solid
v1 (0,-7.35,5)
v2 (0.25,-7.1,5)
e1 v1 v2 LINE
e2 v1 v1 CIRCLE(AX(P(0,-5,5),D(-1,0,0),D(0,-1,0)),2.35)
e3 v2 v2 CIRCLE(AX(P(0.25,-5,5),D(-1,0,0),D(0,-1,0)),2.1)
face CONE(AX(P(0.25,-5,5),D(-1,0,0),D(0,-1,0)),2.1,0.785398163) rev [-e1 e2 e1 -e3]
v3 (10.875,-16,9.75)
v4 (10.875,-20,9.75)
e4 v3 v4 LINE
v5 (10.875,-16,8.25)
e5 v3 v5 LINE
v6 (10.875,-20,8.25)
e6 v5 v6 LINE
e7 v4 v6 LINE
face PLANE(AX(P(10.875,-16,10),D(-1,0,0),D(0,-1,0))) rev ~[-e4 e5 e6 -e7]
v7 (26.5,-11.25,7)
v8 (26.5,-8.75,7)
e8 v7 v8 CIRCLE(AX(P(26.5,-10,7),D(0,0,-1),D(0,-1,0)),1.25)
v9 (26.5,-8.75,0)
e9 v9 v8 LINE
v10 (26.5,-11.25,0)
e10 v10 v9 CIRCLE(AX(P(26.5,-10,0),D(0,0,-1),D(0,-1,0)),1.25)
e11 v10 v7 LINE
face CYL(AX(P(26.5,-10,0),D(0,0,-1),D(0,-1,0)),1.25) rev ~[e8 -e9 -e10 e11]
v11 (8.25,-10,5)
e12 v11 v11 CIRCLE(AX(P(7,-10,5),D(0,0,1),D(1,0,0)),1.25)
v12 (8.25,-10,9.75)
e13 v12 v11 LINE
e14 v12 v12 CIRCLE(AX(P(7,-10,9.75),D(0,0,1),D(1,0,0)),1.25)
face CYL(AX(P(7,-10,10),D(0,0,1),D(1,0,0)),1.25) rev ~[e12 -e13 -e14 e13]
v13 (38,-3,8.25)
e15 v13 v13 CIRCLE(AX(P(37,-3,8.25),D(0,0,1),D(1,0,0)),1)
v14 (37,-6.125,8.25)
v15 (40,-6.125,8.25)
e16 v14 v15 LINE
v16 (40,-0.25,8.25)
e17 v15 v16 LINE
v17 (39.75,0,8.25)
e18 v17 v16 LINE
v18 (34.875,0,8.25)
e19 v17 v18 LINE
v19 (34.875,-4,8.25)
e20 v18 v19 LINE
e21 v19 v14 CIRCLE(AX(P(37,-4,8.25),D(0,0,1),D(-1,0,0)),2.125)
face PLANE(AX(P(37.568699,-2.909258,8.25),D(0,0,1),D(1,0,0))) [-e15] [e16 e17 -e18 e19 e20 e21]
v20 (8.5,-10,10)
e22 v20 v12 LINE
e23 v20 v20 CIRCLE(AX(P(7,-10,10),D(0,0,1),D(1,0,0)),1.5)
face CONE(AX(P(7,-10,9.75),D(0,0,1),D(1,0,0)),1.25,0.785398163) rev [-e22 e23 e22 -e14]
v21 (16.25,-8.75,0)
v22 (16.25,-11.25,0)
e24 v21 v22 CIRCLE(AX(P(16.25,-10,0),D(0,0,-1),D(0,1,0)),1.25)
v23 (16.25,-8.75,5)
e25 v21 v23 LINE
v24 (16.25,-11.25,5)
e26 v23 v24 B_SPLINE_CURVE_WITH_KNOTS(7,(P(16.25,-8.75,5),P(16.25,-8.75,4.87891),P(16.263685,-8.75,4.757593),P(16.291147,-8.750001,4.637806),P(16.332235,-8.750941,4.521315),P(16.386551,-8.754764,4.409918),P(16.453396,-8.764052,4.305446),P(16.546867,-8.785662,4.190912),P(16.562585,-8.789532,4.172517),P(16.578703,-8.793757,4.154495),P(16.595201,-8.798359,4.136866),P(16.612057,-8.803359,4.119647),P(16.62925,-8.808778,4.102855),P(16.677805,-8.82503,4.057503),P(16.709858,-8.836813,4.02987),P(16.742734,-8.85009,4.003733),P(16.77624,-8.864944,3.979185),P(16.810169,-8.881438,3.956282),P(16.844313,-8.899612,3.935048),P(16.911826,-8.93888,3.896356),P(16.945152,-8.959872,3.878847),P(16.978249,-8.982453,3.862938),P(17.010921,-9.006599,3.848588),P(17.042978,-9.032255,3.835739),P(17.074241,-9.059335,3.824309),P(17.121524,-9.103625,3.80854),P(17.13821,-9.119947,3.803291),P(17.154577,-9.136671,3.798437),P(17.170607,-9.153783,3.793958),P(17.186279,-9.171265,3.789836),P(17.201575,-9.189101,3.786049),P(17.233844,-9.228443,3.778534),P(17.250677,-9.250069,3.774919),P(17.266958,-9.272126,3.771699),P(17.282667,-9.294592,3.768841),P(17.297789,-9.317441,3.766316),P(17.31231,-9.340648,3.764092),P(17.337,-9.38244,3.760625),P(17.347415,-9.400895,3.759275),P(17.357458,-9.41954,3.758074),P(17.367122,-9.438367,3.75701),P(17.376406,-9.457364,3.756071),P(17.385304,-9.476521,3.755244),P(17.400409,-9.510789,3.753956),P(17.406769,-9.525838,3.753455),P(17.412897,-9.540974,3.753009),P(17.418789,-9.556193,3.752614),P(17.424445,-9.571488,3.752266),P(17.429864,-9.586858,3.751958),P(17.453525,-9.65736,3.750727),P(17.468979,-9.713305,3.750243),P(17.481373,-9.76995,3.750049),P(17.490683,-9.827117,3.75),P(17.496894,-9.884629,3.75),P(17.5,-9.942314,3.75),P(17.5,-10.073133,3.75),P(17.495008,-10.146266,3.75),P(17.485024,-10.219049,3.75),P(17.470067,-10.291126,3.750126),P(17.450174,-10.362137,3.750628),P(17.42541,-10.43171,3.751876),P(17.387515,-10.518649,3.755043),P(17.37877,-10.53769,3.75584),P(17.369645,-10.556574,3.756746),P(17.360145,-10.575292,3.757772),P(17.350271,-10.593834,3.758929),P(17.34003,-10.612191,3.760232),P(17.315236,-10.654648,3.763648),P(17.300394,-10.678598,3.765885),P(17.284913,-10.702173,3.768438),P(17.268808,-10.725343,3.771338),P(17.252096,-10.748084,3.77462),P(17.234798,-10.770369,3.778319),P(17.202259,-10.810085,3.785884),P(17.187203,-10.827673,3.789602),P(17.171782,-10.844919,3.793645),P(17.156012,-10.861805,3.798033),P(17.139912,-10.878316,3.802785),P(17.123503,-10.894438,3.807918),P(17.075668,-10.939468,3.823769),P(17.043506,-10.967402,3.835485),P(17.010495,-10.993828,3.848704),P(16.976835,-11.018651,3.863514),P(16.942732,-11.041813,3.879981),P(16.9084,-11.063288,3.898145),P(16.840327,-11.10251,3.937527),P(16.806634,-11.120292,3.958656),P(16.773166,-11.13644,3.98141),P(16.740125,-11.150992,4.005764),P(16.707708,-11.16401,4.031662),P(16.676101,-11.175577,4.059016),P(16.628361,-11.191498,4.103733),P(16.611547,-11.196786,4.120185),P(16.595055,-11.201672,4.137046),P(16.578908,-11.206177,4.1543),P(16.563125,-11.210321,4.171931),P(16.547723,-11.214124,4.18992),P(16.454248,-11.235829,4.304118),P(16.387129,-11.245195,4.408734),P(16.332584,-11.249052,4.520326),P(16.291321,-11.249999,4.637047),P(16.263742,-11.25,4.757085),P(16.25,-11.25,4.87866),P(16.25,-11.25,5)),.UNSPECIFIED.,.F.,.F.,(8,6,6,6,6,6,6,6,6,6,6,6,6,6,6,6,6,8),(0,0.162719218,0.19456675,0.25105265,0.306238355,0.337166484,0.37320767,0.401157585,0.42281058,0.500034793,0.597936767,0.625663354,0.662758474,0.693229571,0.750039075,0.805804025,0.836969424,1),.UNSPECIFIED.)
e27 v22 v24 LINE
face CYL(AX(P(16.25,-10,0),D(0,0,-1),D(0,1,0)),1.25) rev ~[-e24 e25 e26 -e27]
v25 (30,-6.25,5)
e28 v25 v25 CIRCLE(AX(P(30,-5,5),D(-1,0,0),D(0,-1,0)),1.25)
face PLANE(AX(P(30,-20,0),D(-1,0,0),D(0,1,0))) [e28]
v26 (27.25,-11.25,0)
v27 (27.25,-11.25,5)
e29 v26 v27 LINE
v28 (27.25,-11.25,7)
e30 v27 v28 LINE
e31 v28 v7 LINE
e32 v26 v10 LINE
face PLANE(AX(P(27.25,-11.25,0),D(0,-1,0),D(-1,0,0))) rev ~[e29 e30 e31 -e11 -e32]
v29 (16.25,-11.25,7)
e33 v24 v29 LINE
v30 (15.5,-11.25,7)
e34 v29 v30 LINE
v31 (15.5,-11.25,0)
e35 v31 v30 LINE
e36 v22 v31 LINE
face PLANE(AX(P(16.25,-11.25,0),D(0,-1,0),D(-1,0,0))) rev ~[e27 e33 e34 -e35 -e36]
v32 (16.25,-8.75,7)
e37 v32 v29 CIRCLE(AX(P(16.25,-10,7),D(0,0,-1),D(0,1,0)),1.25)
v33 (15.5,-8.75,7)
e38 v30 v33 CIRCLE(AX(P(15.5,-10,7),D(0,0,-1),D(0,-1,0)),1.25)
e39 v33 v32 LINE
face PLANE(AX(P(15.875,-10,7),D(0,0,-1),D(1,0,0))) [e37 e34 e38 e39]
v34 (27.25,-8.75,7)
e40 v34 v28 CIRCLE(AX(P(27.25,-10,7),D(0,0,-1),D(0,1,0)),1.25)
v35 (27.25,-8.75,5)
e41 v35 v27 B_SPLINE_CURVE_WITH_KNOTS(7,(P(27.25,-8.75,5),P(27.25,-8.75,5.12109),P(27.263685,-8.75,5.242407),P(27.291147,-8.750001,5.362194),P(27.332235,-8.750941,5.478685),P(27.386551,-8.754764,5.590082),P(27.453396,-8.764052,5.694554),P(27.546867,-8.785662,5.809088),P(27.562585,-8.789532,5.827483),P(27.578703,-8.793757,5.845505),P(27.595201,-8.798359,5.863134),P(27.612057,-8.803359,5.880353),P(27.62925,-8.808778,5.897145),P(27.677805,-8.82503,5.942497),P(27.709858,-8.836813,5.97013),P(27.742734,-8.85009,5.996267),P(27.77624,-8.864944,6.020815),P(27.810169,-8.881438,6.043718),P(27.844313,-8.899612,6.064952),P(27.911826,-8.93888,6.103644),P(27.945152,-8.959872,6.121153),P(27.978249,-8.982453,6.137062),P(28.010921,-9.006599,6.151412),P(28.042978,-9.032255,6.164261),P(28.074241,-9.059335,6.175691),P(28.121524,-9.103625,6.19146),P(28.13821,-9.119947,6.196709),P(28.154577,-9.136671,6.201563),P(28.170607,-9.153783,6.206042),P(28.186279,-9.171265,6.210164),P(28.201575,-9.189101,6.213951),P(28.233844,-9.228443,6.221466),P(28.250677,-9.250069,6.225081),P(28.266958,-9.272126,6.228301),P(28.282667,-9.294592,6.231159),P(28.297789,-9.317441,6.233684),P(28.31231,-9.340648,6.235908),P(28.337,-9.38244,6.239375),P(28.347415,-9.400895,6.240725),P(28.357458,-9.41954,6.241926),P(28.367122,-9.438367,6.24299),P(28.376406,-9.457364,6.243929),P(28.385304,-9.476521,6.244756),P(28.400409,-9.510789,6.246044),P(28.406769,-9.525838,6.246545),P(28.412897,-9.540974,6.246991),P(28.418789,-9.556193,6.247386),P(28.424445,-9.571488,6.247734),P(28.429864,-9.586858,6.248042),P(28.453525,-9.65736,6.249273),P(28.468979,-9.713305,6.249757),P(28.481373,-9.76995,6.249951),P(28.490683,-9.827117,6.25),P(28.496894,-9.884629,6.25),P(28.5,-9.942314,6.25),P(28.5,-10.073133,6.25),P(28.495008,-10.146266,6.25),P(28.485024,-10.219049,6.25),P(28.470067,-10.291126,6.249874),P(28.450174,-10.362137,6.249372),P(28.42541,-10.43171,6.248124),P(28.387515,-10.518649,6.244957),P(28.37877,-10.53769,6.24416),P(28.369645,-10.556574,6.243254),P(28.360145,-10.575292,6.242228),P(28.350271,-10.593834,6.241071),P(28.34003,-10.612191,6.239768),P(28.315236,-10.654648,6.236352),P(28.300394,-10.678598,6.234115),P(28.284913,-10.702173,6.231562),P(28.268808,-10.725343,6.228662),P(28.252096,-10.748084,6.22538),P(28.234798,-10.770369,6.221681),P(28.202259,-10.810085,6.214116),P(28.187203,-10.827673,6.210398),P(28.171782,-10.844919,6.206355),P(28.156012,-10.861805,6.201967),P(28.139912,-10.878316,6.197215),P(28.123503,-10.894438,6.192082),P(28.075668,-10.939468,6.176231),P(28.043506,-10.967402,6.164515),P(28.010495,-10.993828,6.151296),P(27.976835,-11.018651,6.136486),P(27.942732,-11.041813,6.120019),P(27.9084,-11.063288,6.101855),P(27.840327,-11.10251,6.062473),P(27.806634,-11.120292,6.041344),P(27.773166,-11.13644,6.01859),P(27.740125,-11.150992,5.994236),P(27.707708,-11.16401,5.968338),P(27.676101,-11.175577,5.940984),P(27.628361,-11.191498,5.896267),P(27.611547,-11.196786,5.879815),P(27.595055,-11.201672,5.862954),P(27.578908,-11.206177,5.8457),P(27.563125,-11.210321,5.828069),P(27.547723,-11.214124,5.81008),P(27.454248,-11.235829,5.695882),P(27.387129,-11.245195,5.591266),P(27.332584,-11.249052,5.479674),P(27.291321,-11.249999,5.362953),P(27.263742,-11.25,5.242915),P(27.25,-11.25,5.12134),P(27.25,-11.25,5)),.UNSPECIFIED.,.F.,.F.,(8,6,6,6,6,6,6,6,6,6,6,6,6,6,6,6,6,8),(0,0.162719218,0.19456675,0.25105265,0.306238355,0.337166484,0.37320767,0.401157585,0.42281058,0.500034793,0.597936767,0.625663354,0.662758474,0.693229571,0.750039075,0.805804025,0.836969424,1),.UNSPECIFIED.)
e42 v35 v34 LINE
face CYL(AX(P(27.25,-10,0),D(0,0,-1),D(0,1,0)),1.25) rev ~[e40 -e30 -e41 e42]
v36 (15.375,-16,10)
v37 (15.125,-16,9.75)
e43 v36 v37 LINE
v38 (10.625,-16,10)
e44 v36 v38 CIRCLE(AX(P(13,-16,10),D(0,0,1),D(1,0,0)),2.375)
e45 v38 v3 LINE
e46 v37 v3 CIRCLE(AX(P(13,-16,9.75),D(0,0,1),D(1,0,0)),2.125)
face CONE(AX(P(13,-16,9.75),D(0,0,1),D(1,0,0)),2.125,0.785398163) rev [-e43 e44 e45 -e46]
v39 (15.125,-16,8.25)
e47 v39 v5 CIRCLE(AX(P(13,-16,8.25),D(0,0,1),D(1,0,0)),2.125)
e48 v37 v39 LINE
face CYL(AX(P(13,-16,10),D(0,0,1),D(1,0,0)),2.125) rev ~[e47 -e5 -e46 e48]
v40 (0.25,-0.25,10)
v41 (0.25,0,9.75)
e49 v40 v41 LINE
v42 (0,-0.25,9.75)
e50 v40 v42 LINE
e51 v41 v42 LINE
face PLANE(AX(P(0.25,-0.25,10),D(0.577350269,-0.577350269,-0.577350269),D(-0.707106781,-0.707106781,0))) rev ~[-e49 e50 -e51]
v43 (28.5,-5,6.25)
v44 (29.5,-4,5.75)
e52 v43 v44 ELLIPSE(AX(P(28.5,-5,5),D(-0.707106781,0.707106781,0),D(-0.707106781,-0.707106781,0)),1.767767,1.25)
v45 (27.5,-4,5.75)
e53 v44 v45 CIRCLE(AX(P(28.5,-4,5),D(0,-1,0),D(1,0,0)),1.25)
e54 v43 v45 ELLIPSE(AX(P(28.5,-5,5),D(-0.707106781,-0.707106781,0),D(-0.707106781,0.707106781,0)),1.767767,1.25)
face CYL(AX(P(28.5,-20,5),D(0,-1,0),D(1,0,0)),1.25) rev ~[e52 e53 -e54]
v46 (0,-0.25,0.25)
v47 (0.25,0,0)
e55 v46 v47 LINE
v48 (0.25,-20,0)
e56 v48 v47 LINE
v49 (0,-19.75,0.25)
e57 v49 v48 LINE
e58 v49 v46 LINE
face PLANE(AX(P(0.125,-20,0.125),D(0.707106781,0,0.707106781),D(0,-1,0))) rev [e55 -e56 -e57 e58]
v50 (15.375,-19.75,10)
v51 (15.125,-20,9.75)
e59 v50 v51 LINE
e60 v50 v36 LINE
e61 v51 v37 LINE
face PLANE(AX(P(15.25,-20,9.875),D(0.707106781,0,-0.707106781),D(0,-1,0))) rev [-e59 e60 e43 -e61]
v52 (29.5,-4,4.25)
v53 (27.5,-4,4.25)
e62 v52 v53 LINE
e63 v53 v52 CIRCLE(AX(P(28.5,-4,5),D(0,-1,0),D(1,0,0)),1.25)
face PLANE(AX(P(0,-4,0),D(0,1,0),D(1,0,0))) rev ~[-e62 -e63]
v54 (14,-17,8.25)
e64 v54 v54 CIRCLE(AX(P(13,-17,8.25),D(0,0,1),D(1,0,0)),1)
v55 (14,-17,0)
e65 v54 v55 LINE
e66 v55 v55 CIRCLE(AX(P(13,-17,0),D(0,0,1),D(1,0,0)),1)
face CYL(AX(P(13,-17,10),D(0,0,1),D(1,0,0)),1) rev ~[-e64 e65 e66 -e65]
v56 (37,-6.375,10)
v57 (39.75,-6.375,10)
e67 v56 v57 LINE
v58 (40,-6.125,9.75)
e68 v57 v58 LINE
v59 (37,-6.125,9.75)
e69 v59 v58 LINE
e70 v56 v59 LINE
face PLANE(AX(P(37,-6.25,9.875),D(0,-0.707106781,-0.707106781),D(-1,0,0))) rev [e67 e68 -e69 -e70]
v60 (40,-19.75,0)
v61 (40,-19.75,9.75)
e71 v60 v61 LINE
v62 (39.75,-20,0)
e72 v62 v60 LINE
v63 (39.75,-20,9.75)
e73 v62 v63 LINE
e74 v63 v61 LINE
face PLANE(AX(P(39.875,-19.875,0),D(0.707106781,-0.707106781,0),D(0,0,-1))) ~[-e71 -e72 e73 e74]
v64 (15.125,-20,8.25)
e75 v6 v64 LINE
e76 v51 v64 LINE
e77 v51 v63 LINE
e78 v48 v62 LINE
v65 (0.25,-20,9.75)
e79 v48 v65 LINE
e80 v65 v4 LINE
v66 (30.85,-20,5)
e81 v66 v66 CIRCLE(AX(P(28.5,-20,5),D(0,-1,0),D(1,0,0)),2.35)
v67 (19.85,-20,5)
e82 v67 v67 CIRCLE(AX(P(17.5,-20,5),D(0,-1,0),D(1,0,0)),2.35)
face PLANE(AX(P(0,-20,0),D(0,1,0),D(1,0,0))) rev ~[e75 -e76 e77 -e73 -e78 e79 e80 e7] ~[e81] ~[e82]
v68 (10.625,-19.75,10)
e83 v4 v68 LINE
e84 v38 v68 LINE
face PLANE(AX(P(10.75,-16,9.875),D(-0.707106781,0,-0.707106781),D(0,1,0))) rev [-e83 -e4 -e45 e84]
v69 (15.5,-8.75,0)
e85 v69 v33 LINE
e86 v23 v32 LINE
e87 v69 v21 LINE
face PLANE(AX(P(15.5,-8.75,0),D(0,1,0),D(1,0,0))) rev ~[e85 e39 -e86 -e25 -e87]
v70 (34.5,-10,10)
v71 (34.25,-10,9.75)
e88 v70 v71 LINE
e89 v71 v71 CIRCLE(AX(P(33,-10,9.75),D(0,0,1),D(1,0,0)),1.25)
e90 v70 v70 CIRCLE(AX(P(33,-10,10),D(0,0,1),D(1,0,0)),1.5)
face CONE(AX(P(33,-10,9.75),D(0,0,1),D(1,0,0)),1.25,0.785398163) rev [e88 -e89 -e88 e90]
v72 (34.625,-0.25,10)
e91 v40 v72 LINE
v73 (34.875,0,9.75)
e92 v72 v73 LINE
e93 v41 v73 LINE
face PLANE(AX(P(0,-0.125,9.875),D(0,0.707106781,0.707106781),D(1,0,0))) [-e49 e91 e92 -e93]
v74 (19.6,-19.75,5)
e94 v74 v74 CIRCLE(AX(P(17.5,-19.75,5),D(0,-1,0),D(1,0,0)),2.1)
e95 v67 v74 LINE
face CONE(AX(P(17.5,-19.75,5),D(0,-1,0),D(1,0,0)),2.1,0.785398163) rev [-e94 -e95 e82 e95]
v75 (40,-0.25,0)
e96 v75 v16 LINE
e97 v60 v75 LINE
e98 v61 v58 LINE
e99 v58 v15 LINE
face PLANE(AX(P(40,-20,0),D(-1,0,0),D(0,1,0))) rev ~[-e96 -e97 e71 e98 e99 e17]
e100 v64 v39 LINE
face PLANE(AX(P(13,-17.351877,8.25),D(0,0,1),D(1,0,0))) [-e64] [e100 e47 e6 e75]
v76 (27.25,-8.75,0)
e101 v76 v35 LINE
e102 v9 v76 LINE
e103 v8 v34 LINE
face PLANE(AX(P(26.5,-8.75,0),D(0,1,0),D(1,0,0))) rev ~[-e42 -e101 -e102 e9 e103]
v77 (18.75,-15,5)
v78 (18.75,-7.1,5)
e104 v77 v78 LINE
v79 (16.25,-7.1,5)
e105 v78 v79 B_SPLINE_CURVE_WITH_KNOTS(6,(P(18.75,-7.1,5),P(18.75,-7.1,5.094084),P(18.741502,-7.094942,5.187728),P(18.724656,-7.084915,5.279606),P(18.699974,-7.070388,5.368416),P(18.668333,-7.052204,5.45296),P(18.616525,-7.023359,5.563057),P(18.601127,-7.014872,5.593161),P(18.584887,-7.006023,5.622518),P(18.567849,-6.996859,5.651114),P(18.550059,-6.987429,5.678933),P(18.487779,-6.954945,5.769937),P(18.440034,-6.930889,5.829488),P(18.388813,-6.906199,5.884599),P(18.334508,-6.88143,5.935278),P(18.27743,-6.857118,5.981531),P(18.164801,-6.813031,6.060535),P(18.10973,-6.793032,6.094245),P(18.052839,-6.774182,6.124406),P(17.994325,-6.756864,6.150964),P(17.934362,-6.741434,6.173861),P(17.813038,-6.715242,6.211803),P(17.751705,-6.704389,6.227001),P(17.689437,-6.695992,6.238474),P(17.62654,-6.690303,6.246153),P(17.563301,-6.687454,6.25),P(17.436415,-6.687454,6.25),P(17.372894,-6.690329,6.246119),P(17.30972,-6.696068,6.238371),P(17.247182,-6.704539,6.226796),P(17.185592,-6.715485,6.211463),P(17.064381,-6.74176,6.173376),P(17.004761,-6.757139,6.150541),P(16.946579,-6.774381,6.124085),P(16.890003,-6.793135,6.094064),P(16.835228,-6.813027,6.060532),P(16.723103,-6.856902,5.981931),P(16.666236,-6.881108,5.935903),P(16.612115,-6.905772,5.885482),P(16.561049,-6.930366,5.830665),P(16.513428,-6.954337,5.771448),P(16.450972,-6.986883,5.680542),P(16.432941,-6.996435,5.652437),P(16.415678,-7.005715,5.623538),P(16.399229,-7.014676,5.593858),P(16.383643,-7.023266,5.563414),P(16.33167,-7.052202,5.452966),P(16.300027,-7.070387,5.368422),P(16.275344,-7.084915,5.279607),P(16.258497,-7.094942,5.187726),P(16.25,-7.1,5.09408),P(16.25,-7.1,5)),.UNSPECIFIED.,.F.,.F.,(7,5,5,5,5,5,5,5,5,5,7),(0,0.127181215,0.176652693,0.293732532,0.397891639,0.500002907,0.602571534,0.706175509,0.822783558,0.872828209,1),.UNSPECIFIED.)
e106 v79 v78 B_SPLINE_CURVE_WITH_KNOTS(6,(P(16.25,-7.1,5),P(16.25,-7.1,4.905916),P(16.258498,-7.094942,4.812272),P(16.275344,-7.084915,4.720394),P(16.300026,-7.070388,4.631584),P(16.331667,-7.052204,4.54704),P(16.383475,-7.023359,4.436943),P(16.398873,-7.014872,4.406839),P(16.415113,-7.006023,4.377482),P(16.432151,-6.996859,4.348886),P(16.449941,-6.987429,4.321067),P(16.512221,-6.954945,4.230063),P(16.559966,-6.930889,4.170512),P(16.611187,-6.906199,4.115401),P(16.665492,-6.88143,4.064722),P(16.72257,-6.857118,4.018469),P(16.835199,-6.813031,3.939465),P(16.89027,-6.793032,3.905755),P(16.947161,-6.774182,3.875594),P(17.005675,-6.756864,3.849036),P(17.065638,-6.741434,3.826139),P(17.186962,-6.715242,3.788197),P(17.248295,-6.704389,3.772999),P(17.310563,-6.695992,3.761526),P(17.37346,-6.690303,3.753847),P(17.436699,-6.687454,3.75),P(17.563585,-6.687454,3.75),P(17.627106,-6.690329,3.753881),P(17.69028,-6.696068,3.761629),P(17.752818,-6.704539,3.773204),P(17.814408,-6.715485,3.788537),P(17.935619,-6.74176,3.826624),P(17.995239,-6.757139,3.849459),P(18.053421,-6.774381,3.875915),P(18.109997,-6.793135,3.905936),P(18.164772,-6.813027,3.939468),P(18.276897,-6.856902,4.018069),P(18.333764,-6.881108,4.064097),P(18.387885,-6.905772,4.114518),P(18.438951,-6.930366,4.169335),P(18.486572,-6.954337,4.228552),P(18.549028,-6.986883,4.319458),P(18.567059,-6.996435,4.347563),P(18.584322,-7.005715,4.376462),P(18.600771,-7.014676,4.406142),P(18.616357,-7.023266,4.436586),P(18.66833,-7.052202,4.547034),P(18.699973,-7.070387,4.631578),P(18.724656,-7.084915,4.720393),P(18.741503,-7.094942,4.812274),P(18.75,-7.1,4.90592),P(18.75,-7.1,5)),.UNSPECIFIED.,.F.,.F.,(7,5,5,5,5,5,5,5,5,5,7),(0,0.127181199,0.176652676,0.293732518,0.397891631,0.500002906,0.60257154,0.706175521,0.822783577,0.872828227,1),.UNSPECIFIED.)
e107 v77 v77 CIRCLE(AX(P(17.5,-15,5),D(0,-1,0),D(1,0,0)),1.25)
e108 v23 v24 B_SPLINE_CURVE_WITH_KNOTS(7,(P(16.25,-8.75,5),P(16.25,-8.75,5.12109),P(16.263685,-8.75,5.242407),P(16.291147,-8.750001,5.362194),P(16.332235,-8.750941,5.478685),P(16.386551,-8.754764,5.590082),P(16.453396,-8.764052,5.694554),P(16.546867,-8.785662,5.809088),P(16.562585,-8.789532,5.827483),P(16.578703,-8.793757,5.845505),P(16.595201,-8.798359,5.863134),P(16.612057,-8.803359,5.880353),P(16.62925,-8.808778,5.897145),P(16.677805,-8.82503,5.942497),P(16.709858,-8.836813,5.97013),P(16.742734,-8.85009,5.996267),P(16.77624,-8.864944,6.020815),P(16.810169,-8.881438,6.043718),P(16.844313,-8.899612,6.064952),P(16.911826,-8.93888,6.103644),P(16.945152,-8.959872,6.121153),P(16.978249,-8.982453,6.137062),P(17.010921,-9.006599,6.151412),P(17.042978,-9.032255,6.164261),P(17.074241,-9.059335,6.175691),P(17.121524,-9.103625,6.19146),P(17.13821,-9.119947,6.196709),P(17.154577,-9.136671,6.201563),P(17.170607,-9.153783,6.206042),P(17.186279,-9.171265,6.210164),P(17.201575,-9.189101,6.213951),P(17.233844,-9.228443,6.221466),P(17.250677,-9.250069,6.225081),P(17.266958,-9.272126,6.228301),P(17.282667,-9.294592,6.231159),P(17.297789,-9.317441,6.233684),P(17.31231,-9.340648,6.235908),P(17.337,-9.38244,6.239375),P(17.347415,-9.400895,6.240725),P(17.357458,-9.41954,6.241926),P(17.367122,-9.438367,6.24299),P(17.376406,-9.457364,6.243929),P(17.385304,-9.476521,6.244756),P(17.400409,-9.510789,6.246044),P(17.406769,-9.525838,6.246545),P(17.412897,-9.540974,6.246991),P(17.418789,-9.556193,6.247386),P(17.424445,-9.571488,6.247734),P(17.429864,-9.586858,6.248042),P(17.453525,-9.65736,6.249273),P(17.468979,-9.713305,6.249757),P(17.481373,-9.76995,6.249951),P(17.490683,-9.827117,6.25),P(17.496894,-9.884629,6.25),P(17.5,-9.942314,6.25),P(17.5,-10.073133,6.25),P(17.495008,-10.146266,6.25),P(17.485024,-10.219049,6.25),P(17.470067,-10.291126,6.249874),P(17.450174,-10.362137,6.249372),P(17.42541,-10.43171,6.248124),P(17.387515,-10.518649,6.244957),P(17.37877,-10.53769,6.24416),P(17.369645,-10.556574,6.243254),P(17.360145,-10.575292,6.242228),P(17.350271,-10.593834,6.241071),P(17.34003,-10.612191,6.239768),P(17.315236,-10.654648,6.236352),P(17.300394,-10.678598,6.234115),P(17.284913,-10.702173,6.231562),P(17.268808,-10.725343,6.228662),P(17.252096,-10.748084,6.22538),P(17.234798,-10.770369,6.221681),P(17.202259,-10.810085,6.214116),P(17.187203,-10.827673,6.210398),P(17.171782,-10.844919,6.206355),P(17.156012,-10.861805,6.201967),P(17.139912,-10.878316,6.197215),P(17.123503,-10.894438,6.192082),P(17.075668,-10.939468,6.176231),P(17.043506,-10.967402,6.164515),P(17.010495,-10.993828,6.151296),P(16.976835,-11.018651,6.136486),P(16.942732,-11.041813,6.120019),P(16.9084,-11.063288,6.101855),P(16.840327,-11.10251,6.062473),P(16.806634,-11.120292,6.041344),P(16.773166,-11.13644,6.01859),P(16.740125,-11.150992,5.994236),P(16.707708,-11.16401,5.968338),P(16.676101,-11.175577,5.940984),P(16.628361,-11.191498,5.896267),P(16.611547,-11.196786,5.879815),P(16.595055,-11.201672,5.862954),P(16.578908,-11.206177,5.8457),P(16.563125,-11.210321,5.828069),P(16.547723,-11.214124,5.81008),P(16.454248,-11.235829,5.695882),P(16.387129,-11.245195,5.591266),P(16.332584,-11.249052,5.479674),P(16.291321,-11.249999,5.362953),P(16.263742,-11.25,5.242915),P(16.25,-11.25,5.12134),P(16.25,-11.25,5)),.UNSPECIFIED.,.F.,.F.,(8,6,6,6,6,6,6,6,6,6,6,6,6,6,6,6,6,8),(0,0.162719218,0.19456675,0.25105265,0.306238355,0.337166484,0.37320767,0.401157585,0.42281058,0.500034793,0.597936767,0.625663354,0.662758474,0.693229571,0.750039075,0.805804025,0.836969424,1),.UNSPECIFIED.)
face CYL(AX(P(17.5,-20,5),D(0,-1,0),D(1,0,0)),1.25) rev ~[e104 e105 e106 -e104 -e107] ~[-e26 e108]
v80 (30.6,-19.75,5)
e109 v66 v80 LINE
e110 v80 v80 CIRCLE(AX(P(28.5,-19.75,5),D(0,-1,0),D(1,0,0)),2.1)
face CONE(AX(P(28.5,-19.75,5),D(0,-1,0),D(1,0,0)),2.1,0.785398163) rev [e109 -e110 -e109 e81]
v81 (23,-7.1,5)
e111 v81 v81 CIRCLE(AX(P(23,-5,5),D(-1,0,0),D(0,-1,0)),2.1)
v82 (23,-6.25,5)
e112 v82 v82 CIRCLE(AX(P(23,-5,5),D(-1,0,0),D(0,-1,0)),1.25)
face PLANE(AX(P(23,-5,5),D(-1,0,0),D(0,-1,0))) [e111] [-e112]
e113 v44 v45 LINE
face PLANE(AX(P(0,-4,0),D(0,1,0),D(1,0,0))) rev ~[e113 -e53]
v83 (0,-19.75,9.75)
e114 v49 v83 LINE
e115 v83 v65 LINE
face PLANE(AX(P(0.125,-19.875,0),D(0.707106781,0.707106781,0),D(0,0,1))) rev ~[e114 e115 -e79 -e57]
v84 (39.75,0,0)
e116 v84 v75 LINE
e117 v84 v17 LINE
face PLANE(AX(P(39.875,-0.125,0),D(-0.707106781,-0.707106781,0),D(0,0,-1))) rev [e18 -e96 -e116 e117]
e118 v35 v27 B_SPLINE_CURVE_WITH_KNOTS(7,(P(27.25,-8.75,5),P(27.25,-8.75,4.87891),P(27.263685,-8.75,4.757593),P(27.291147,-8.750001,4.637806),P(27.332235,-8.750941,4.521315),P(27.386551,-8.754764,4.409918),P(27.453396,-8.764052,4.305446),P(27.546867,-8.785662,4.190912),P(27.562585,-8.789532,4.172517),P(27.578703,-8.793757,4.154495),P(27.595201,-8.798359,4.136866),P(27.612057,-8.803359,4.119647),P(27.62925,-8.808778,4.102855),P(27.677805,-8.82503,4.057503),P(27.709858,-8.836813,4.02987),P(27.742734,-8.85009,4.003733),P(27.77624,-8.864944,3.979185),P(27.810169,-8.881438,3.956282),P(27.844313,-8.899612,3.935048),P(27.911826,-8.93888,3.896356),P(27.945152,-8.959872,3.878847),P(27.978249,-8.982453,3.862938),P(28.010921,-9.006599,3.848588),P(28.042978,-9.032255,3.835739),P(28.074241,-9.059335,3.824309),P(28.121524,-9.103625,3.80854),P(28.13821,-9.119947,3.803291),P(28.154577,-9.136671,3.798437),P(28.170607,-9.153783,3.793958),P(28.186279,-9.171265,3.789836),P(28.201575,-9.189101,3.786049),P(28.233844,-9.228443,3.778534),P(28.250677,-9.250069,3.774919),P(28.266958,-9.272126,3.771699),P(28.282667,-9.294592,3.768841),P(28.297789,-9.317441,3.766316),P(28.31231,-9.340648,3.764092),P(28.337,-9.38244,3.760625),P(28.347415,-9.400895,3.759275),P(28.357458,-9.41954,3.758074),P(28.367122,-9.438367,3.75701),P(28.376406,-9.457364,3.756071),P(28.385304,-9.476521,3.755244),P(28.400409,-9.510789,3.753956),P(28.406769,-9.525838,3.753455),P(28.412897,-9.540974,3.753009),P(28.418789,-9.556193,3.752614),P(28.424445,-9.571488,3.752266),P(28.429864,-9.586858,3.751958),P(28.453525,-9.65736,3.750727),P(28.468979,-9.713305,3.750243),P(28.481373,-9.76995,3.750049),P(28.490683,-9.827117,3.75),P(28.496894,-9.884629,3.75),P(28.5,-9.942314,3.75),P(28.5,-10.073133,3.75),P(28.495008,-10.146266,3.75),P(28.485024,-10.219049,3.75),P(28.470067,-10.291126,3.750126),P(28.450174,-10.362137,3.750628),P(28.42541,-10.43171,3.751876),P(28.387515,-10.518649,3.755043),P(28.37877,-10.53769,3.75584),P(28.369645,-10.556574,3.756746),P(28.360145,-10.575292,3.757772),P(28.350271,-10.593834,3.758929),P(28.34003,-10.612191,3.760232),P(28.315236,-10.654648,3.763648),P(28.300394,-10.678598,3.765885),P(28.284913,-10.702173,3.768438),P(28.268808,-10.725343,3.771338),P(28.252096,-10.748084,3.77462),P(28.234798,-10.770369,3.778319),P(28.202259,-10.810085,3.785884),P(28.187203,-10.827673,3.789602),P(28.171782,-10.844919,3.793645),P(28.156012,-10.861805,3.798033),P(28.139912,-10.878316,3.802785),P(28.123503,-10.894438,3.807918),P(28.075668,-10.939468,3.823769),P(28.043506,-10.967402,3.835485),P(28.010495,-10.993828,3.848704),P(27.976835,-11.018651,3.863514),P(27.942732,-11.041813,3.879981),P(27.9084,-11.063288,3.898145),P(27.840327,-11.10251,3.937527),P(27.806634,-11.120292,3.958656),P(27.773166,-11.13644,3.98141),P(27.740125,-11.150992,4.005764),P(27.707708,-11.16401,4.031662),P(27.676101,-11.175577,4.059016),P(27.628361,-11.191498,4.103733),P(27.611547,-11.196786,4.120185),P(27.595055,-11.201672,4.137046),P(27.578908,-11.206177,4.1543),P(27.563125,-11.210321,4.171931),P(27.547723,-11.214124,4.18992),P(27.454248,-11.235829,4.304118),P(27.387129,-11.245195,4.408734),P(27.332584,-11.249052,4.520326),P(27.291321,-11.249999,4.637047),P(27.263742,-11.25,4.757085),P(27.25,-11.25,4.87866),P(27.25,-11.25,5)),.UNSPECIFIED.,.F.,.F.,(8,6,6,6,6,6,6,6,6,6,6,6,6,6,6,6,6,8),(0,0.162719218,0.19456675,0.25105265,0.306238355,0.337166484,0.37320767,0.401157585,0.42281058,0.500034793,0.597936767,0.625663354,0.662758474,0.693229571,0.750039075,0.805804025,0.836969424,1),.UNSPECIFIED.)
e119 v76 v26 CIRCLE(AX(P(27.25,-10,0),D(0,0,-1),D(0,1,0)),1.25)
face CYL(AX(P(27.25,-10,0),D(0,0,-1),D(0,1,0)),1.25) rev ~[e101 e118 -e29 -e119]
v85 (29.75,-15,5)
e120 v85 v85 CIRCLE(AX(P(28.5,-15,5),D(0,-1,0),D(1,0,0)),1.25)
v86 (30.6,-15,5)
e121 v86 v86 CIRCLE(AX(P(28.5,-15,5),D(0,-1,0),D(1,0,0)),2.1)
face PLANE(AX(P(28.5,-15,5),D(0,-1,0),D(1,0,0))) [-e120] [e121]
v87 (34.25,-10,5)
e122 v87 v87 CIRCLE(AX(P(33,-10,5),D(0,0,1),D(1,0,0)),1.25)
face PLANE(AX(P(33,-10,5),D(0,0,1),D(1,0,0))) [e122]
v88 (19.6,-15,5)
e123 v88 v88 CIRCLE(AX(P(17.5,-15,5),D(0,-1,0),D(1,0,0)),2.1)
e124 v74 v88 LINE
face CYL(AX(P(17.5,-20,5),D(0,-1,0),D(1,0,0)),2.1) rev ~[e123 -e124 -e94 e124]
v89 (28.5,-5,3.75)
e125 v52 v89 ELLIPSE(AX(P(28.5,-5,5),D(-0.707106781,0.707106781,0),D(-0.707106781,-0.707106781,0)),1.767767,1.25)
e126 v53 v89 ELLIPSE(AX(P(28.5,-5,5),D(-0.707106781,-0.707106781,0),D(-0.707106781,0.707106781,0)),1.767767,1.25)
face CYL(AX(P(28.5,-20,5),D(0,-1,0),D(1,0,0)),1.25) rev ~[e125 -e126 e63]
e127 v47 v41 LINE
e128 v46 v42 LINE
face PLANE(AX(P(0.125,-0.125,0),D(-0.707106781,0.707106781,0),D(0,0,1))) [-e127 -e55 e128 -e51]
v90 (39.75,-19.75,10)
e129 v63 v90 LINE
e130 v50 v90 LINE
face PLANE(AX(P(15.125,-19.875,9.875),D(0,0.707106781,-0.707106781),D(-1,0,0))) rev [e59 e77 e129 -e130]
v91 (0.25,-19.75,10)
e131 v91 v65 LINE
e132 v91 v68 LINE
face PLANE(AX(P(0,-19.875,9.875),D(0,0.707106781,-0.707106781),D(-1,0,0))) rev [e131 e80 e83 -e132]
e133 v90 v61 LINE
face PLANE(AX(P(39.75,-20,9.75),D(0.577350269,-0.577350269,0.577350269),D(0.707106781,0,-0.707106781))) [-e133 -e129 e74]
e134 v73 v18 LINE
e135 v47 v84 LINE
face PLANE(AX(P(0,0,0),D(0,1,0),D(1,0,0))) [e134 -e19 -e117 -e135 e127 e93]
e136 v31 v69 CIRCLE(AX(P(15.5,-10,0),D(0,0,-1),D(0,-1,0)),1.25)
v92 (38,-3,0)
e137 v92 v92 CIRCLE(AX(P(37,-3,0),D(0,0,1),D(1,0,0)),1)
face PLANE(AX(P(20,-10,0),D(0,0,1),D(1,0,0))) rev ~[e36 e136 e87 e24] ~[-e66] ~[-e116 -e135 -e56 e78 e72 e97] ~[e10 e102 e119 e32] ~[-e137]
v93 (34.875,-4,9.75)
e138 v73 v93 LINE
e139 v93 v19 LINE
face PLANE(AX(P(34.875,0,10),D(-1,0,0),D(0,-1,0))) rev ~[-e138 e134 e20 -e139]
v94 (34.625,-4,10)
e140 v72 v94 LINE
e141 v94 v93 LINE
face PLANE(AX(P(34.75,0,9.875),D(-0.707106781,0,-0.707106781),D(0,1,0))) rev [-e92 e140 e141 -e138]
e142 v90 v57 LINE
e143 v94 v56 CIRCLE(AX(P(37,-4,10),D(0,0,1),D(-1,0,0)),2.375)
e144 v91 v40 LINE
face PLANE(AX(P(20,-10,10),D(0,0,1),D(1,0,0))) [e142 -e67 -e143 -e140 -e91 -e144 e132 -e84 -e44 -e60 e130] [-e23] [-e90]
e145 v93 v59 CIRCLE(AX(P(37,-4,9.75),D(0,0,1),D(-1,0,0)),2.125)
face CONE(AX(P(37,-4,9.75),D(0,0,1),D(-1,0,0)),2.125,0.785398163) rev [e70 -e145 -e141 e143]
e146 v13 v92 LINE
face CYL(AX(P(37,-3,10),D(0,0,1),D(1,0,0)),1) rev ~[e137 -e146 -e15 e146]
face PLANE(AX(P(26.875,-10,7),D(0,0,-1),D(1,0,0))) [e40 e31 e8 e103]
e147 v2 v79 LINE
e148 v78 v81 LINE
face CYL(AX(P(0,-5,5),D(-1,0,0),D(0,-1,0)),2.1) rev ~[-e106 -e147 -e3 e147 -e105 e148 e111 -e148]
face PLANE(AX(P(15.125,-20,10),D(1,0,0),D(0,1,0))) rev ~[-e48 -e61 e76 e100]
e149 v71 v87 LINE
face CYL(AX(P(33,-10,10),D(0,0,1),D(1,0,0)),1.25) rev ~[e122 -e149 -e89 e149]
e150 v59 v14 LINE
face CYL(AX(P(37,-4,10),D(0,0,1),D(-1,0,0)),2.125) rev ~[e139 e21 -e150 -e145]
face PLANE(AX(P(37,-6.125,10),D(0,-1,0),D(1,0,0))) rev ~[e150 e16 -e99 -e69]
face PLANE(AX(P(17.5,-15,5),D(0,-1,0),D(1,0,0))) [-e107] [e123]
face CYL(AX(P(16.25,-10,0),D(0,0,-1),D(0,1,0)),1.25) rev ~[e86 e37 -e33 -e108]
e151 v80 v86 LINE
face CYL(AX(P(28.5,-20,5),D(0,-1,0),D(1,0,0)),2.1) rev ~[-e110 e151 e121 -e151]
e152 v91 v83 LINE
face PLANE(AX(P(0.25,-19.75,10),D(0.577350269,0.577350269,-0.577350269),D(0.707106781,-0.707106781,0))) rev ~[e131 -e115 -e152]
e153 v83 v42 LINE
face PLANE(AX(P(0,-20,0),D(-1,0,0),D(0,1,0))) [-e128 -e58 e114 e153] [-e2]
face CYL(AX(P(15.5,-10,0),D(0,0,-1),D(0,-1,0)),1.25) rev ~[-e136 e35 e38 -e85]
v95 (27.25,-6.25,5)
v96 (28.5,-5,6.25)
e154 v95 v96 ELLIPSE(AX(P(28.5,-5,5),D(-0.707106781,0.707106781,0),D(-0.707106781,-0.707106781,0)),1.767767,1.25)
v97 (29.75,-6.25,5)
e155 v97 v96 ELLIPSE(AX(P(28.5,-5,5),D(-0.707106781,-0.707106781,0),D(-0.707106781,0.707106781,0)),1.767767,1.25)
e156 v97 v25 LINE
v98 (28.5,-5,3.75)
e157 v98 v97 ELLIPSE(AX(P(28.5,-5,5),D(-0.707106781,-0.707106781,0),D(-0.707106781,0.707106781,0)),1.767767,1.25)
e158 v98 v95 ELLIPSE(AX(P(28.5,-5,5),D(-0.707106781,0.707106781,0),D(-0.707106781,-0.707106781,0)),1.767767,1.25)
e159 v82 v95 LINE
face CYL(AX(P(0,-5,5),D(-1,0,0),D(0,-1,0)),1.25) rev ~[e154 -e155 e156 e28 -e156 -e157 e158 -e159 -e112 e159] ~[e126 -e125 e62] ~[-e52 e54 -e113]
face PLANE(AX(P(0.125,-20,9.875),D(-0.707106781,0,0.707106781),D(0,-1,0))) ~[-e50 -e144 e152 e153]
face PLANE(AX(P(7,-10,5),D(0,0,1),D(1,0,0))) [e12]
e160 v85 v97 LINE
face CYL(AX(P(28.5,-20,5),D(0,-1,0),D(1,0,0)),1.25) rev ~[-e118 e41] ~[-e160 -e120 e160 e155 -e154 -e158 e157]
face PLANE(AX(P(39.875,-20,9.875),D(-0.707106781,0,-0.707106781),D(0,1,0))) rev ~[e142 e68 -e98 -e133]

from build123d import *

# Parameters (mm, degrees)
F0_W      = 40
F0_H      = 20
F1_DEPTH  = 10
F2_R      = 2.1
F2_R_2    = 1.25
F3_DEPTH  = 5
F4_R      = 1
F6_DEPTH  = 25
F8_DEPTH  = 7
F10_DEPTH = 1.75
F9_R      = 2.1
F9_R_2    = 1.25
F11_DEPTH = 23
F12_R     = 1.25
F13_DEPTH = 5
F14_SIZE  = 0.25
F15_DEPTH = 30
F16_DEPTH = 16


# Not quite as in the source:
# - a feature names something its author has since deleted; it is built from what else it names


with BuildPart() as f1:
    # F0 (on Top) → F1 (new body)
    with BuildSketch(Plane.XY):
        with Locations((20, -10)):
            Rectangle(F0_W, F0_H)
    extrude(amount=F1_DEPTH)

    # F2 (on face) → F3 (cut)
    with BuildSketch(Plane.XZ.offset(20)):
        with Locations((28.5, 5)):
            Circle(F2_R)
        with Locations((28.5, 5)):
            Circle(F2_R_2, mode=Mode.SUBTRACT)
        with Locations((17.5, 5)):
            Circle(F2_R)
        with Locations((17.5, 5)):
            Circle(F2_R_2, mode=Mode.SUBTRACT)
    extrude(amount=-F3_DEPTH, mode=Mode.SUBTRACT)

    # F4 (on face) → F6 (cut)
    with BuildSketch(Plane.XY.offset(10)):
        with Locations((13, -17)):
            Circle(F4_R)
        with Locations((37, -3)):
            Circle(F4_R)
    extrude(amount=-F6_DEPTH, mode=Mode.SUBTRACT)

    # F7 (on face) → F8 (cut)
    with BuildSketch(Plane(origin=(0, 0, 0), x_dir=(1, 0, 0), z_dir=(0, 0, -1))):
        with BuildLine():
            Line((16.25, 11.25), (15.5, 11.25))
            ThreePointArc((15.5, 11.25), (14.25, 10), (15.5, 8.75))
            Line((15.5, 8.75), (16.25, 8.75))
            ThreePointArc((16.25, 8.75), (17.5, 10), (16.25, 11.25))
        make_face()
        with BuildLine():
            Line((27.25, 11.25), (26.5, 11.25))
            ThreePointArc((26.5, 11.25), (25.25, 10), (26.5, 8.75))
            Line((26.5, 8.75), (27.25, 8.75))
            ThreePointArc((27.25, 8.75), (28.5, 10), (27.25, 11.25))
        make_face()
    extrude(amount=-F8_DEPTH, mode=Mode.SUBTRACT)

    # F4 (on face) → F10 (cut)
    with BuildSketch(Plane.XY.offset(10)):
        with BuildLine():
            Line((15.125, -20), (15.125, -16))
            ThreePointArc((15.125, -16), (13, -13.875), (10.875, -16))
            Line((10.875, -16), (10.875, -20))
            Line((10.875, -20), (15.125, -20))
        make_face()
        with Locations((13, -17)):
            Circle(F4_R, mode=Mode.SUBTRACT)
        with BuildLine():
            Line((37, -6.125), (40, -6.125))
            Line((40, -6.125), (40, 0))
            Line((40, 0), (34.875, 0))
            Line((34.875, 0), (34.875, -4))
            ThreePointArc((34.875, -4), (35.49739809, -5.50260191), (37, -6.125))
        make_face()
        with Locations((37, -3)):
            Circle(F4_R, mode=Mode.SUBTRACT)
    extrude(amount=-F10_DEPTH, mode=Mode.SUBTRACT)

    # F9 (on face) → F11 (cut)
    with BuildSketch(Plane(origin=(0, 0, 0), x_dir=(0, -1, 0), z_dir=(-1, 0, 0))):
        with Locations((5, 5)):
            Circle(F9_R)
        with Locations((5, 5)):
            Circle(F9_R_2, mode=Mode.SUBTRACT)
    extrude(amount=-F11_DEPTH, mode=Mode.SUBTRACT)

    # F12 (on face) → F13 (cut)
    with BuildSketch(Plane.XY.offset(10)):
        with Locations((7, -10)):
            Circle(F12_R)
        with Locations((33, -10)):
            Circle(F12_R)
    extrude(amount=-F13_DEPTH, mode=Mode.SUBTRACT)

    # F14
    f14_edges = [f1.edges().sort_by_distance(p)[0] for p in [
        (15.4, -20, 5),
        (26.4, -20, 5),
        (0, 0, 5),
        (0, -20, 5),
        (34.875, -2, 10),
        (17.4375, 0, 10),
        (35.497398, -5.502602, 10),
        (0, -10, 10),
        (38.5, -6.125, 10),
        (5.4375, -20, 10),
        (40, -13.0625, 10),
        (10.875, -18, 10),
        (27.5625, -20, 10),
        (13, -13.875, 10),
        (15.125, -18, 10),
        (5.75, -10, 10),
        (31.75, -10, 10),
        (0, -10, 0),
        (40, -20, 5),
        (40, 0, 4.125),
        (0, -2.9, 5),
    ]]
    chamfer(f14_edges, length=F14_SIZE)

    # F15 (cut): a face of the model
    f15_faces = [f1.faces().sort_by_distance(p)[0] for p in [
        (0, -5, 5),
    ]]
    extrude(f15_faces, amount=-F15_DEPTH, mode=Mode.SUBTRACT)

    # F16 (cut): faces of the model
    f16_faces = [f1.faces().sort_by_distance(p)[0] for p in [
        (17.5, -20, 5),
        (28.5, -20, 5),
    ]]
    extrude(f16_faces, amount=-F16_DEPTH, mode=Mode.SUBTRACT)


solid = f1.part
